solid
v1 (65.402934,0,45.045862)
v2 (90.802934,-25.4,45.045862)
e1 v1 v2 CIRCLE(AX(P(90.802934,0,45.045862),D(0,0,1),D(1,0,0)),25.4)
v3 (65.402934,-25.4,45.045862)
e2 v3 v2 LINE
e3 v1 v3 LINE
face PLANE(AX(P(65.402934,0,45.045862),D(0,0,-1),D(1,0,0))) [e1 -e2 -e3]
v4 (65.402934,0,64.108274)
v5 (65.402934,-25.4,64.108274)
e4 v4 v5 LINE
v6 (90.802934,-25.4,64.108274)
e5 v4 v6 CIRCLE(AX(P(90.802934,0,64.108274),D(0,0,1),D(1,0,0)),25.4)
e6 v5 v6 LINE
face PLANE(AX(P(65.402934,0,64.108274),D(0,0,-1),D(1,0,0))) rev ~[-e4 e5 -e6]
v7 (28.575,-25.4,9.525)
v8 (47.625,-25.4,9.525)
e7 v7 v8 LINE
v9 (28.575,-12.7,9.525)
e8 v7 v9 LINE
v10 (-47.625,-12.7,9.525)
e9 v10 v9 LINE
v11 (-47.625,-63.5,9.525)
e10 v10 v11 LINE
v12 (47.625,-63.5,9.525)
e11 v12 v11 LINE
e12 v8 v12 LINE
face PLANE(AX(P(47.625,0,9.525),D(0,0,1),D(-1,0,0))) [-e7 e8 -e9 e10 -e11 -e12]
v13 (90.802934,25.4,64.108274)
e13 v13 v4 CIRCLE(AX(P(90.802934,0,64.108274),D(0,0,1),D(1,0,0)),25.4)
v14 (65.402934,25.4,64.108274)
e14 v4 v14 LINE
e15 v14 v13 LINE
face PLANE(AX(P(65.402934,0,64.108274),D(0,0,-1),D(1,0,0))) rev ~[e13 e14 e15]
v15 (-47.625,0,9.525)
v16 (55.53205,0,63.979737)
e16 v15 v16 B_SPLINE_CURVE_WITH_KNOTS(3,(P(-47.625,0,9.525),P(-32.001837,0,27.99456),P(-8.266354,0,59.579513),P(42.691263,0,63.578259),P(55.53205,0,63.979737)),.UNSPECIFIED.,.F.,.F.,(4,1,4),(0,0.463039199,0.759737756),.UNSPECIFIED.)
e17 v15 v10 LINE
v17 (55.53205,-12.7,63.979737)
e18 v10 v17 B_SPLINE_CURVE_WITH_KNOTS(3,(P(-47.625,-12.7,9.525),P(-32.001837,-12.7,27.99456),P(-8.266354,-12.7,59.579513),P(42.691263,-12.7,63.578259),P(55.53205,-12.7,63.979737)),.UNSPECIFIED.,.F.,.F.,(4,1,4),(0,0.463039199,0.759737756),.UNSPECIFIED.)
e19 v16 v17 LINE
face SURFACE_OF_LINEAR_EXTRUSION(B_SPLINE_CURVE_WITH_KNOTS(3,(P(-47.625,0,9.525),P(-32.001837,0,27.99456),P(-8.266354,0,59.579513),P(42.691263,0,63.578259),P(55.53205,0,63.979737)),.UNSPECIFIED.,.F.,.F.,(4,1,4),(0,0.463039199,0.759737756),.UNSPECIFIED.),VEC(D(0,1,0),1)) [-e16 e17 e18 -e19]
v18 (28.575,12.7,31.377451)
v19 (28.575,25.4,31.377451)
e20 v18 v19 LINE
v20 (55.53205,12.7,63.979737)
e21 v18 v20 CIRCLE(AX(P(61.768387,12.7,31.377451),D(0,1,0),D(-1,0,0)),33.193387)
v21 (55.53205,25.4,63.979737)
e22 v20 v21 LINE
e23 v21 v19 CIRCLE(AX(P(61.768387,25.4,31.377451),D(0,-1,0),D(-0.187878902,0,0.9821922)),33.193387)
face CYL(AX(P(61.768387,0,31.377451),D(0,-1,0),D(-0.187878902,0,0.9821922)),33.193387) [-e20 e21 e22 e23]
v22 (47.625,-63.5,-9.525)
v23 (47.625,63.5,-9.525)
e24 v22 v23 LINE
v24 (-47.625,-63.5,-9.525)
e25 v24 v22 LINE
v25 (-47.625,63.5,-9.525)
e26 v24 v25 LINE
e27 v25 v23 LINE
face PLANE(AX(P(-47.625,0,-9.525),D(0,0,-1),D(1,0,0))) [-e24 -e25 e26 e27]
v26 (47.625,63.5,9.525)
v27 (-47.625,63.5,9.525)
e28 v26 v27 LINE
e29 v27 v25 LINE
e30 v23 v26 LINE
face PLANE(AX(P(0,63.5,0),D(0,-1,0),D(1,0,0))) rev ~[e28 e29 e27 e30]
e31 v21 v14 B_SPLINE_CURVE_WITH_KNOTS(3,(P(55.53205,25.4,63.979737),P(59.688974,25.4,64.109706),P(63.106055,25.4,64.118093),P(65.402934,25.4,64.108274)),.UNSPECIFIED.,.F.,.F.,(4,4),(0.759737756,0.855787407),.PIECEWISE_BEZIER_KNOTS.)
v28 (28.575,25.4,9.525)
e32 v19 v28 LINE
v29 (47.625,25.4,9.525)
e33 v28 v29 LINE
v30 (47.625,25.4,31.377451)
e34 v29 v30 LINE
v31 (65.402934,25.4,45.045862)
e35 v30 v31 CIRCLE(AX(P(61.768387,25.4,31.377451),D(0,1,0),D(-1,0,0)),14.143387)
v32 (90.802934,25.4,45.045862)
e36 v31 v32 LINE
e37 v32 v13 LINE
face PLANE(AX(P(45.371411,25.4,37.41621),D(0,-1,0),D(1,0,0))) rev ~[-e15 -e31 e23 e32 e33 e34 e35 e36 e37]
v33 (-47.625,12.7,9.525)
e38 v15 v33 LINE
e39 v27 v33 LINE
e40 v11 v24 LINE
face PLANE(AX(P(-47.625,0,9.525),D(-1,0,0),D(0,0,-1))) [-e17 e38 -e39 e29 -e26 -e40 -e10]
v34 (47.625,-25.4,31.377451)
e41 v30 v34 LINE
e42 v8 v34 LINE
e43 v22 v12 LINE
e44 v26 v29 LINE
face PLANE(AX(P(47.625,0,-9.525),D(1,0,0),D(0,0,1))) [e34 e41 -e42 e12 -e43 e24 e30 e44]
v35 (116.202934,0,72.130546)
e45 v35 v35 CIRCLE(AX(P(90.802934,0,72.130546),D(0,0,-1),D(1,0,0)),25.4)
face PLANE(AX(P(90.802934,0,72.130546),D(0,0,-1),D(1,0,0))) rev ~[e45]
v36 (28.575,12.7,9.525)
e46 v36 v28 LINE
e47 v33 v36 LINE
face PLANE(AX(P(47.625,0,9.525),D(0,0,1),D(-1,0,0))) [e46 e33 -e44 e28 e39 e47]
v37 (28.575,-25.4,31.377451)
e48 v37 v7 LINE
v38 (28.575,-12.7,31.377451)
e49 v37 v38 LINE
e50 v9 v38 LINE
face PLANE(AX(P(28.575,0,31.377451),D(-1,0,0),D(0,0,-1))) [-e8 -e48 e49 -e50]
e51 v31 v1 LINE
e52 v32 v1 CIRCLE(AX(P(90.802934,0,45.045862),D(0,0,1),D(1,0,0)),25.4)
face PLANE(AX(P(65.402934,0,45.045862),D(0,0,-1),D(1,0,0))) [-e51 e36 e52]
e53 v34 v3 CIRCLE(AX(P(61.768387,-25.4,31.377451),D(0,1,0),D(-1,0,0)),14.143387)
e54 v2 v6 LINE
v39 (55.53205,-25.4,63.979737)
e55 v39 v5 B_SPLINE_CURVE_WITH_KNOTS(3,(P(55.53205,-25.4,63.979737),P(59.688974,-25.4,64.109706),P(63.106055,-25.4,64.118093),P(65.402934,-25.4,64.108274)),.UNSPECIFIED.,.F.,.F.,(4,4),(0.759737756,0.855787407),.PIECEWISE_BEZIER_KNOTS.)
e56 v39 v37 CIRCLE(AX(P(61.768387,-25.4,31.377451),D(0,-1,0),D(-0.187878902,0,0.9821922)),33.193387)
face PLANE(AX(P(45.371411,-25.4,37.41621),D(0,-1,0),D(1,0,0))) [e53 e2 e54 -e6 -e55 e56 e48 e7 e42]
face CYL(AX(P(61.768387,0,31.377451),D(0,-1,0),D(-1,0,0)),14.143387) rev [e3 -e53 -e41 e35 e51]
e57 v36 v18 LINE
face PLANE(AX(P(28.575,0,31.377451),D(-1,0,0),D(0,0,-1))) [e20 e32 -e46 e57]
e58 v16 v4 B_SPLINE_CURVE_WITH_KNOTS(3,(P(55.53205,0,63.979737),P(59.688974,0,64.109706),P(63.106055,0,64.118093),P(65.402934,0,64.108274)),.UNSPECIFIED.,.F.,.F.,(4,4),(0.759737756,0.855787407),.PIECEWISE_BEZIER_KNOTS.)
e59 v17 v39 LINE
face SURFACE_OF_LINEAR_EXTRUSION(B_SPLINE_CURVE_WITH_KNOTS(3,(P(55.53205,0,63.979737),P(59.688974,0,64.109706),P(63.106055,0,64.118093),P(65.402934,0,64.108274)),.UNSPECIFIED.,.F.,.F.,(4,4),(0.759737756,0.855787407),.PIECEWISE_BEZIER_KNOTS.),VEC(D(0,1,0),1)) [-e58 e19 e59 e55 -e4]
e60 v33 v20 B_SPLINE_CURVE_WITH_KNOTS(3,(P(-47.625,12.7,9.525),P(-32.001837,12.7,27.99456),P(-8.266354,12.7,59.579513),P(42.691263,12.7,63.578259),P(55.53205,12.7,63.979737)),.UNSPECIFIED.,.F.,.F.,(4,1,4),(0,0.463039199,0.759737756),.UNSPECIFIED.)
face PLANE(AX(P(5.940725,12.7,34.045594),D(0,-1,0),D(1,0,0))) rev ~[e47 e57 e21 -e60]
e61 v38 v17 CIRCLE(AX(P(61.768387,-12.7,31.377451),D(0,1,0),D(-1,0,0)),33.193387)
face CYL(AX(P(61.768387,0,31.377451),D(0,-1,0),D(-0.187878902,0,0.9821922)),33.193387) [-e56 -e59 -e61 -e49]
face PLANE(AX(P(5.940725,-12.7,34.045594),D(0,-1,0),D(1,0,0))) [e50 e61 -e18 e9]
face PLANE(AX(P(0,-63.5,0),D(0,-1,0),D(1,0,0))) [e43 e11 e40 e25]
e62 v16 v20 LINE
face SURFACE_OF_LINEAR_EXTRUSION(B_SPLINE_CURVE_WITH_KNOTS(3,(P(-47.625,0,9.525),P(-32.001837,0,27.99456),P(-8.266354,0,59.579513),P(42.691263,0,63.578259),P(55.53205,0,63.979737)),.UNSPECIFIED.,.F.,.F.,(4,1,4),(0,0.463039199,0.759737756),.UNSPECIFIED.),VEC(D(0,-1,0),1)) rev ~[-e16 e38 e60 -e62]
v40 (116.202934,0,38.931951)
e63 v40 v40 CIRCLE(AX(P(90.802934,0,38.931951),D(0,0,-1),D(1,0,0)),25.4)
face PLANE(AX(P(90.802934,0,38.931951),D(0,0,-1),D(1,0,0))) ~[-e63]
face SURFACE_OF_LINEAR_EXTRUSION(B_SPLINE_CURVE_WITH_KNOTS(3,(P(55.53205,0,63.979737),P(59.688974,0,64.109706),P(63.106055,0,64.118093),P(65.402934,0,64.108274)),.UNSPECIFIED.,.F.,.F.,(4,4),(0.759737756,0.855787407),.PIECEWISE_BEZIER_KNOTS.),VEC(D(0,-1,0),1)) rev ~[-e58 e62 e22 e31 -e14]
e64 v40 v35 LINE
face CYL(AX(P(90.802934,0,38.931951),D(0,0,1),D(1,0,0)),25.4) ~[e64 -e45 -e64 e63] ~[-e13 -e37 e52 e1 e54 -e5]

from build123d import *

# Parameters (mm, degrees)
F1_DEPTH = 63.5
F2_DEPTH = 12.7
F0_W     = 25.4
F0_H     = 19.0624117216
F3_DEPTH = 25.4


# Not quite as in the source:
# - a feature names something its author has since deleted; it is built from what else it names


with BuildPart() as f1:
    # F0 (on Front) → F1 (new body, symmetric)
    with BuildSketch(Plane.XZ):
        Polygon((47.625, -9.525), (47.625, 9.525), (28.575, 9.525), (-47.625, 9.525), (-47.625, -9.525), align=None)
    extrude(amount=F1_DEPTH, both=True)

    # F0 (on Front) → F2 (join, symmetric)
    with BuildSketch(Plane.XZ):
        with BuildLine():
            Line((-47.625, 9.525), (28.575, 9.525))
            Line((28.575, 9.525), (28.575, 31.3774505112))
            ThreePointArc((28.575, 31.3774505112), (36.1870844323, 52.5292330788), (55.5320502217, 63.9797367269))
            add(Edge.make_bspline(
                [(-47.625, 9.525), (-32.001836586, 27.9945600123), (-8.2663538638, 59.5795130057), (42.691262939, 63.5782592588), (55.5320502217, 63.9797367269)],
                knots=[0, 0, 0, 0, 0.463039199, 0.7597377555, 0.7597377555, 0.7597377555, 0.7597377555], degree=3))
        make_face()
    extrude(amount=F2_DEPTH, both=True)

    # F0 (on Front) → F3 (join, symmetric)
    with BuildSketch(Plane.XZ):
        with BuildLine():
            Line((28.575, 9.525), (47.625, 9.525))
            Line((47.625, 9.525), (47.625, 31.3774505112))
            ThreePointArc((47.625, 31.3774505112), (53.1477549989, 42.5899481953), (65.4029340449, 45.0458622098))
            Line((65.4029340449, 45.0458622098), (65.4029340449, 64.1082739314))
            add(Edge.make_bspline(
                [(55.5320502217, 63.9797367269), (59.6889735266, 64.1097062534), (63.1060550499, 64.1180929217), (65.4029340449, 64.1082739314)],
                knots=[0.7597377555, 0.7597377555, 0.7597377555, 0.7597377555, 0.8557874071, 0.8557874071, 0.8557874071, 0.8557874071], degree=3))
            ThreePointArc((55.5320502217, 63.9797367269), (36.1870844323, 52.5292330788), (28.575, 31.3774505112))
            Line((28.575, 31.3774505112), (28.575, 9.525))
        make_face()
        with Locations((78.1029340449, 54.5770680706)):
            Rectangle(F0_W, F0_H)
    extrude(amount=F3_DEPTH, both=True)

    # F0 (on Front) → F4 (revolve)
    with BuildSketch(Plane.XZ):
        Polygon((90.8029340449, 64.1082739314), (90.8029340449, 45.0458622098), (90.8029340449, 38.931951193), (116.2029340449, 38.931951193), (116.2029340449, 72.13054624), (90.8029340449, 72.13054624), align=None)
    revolve(axis=Axis((90.8029340449, 0, 55.5312487165), (0, 0, -1)))


solid = f1.part
